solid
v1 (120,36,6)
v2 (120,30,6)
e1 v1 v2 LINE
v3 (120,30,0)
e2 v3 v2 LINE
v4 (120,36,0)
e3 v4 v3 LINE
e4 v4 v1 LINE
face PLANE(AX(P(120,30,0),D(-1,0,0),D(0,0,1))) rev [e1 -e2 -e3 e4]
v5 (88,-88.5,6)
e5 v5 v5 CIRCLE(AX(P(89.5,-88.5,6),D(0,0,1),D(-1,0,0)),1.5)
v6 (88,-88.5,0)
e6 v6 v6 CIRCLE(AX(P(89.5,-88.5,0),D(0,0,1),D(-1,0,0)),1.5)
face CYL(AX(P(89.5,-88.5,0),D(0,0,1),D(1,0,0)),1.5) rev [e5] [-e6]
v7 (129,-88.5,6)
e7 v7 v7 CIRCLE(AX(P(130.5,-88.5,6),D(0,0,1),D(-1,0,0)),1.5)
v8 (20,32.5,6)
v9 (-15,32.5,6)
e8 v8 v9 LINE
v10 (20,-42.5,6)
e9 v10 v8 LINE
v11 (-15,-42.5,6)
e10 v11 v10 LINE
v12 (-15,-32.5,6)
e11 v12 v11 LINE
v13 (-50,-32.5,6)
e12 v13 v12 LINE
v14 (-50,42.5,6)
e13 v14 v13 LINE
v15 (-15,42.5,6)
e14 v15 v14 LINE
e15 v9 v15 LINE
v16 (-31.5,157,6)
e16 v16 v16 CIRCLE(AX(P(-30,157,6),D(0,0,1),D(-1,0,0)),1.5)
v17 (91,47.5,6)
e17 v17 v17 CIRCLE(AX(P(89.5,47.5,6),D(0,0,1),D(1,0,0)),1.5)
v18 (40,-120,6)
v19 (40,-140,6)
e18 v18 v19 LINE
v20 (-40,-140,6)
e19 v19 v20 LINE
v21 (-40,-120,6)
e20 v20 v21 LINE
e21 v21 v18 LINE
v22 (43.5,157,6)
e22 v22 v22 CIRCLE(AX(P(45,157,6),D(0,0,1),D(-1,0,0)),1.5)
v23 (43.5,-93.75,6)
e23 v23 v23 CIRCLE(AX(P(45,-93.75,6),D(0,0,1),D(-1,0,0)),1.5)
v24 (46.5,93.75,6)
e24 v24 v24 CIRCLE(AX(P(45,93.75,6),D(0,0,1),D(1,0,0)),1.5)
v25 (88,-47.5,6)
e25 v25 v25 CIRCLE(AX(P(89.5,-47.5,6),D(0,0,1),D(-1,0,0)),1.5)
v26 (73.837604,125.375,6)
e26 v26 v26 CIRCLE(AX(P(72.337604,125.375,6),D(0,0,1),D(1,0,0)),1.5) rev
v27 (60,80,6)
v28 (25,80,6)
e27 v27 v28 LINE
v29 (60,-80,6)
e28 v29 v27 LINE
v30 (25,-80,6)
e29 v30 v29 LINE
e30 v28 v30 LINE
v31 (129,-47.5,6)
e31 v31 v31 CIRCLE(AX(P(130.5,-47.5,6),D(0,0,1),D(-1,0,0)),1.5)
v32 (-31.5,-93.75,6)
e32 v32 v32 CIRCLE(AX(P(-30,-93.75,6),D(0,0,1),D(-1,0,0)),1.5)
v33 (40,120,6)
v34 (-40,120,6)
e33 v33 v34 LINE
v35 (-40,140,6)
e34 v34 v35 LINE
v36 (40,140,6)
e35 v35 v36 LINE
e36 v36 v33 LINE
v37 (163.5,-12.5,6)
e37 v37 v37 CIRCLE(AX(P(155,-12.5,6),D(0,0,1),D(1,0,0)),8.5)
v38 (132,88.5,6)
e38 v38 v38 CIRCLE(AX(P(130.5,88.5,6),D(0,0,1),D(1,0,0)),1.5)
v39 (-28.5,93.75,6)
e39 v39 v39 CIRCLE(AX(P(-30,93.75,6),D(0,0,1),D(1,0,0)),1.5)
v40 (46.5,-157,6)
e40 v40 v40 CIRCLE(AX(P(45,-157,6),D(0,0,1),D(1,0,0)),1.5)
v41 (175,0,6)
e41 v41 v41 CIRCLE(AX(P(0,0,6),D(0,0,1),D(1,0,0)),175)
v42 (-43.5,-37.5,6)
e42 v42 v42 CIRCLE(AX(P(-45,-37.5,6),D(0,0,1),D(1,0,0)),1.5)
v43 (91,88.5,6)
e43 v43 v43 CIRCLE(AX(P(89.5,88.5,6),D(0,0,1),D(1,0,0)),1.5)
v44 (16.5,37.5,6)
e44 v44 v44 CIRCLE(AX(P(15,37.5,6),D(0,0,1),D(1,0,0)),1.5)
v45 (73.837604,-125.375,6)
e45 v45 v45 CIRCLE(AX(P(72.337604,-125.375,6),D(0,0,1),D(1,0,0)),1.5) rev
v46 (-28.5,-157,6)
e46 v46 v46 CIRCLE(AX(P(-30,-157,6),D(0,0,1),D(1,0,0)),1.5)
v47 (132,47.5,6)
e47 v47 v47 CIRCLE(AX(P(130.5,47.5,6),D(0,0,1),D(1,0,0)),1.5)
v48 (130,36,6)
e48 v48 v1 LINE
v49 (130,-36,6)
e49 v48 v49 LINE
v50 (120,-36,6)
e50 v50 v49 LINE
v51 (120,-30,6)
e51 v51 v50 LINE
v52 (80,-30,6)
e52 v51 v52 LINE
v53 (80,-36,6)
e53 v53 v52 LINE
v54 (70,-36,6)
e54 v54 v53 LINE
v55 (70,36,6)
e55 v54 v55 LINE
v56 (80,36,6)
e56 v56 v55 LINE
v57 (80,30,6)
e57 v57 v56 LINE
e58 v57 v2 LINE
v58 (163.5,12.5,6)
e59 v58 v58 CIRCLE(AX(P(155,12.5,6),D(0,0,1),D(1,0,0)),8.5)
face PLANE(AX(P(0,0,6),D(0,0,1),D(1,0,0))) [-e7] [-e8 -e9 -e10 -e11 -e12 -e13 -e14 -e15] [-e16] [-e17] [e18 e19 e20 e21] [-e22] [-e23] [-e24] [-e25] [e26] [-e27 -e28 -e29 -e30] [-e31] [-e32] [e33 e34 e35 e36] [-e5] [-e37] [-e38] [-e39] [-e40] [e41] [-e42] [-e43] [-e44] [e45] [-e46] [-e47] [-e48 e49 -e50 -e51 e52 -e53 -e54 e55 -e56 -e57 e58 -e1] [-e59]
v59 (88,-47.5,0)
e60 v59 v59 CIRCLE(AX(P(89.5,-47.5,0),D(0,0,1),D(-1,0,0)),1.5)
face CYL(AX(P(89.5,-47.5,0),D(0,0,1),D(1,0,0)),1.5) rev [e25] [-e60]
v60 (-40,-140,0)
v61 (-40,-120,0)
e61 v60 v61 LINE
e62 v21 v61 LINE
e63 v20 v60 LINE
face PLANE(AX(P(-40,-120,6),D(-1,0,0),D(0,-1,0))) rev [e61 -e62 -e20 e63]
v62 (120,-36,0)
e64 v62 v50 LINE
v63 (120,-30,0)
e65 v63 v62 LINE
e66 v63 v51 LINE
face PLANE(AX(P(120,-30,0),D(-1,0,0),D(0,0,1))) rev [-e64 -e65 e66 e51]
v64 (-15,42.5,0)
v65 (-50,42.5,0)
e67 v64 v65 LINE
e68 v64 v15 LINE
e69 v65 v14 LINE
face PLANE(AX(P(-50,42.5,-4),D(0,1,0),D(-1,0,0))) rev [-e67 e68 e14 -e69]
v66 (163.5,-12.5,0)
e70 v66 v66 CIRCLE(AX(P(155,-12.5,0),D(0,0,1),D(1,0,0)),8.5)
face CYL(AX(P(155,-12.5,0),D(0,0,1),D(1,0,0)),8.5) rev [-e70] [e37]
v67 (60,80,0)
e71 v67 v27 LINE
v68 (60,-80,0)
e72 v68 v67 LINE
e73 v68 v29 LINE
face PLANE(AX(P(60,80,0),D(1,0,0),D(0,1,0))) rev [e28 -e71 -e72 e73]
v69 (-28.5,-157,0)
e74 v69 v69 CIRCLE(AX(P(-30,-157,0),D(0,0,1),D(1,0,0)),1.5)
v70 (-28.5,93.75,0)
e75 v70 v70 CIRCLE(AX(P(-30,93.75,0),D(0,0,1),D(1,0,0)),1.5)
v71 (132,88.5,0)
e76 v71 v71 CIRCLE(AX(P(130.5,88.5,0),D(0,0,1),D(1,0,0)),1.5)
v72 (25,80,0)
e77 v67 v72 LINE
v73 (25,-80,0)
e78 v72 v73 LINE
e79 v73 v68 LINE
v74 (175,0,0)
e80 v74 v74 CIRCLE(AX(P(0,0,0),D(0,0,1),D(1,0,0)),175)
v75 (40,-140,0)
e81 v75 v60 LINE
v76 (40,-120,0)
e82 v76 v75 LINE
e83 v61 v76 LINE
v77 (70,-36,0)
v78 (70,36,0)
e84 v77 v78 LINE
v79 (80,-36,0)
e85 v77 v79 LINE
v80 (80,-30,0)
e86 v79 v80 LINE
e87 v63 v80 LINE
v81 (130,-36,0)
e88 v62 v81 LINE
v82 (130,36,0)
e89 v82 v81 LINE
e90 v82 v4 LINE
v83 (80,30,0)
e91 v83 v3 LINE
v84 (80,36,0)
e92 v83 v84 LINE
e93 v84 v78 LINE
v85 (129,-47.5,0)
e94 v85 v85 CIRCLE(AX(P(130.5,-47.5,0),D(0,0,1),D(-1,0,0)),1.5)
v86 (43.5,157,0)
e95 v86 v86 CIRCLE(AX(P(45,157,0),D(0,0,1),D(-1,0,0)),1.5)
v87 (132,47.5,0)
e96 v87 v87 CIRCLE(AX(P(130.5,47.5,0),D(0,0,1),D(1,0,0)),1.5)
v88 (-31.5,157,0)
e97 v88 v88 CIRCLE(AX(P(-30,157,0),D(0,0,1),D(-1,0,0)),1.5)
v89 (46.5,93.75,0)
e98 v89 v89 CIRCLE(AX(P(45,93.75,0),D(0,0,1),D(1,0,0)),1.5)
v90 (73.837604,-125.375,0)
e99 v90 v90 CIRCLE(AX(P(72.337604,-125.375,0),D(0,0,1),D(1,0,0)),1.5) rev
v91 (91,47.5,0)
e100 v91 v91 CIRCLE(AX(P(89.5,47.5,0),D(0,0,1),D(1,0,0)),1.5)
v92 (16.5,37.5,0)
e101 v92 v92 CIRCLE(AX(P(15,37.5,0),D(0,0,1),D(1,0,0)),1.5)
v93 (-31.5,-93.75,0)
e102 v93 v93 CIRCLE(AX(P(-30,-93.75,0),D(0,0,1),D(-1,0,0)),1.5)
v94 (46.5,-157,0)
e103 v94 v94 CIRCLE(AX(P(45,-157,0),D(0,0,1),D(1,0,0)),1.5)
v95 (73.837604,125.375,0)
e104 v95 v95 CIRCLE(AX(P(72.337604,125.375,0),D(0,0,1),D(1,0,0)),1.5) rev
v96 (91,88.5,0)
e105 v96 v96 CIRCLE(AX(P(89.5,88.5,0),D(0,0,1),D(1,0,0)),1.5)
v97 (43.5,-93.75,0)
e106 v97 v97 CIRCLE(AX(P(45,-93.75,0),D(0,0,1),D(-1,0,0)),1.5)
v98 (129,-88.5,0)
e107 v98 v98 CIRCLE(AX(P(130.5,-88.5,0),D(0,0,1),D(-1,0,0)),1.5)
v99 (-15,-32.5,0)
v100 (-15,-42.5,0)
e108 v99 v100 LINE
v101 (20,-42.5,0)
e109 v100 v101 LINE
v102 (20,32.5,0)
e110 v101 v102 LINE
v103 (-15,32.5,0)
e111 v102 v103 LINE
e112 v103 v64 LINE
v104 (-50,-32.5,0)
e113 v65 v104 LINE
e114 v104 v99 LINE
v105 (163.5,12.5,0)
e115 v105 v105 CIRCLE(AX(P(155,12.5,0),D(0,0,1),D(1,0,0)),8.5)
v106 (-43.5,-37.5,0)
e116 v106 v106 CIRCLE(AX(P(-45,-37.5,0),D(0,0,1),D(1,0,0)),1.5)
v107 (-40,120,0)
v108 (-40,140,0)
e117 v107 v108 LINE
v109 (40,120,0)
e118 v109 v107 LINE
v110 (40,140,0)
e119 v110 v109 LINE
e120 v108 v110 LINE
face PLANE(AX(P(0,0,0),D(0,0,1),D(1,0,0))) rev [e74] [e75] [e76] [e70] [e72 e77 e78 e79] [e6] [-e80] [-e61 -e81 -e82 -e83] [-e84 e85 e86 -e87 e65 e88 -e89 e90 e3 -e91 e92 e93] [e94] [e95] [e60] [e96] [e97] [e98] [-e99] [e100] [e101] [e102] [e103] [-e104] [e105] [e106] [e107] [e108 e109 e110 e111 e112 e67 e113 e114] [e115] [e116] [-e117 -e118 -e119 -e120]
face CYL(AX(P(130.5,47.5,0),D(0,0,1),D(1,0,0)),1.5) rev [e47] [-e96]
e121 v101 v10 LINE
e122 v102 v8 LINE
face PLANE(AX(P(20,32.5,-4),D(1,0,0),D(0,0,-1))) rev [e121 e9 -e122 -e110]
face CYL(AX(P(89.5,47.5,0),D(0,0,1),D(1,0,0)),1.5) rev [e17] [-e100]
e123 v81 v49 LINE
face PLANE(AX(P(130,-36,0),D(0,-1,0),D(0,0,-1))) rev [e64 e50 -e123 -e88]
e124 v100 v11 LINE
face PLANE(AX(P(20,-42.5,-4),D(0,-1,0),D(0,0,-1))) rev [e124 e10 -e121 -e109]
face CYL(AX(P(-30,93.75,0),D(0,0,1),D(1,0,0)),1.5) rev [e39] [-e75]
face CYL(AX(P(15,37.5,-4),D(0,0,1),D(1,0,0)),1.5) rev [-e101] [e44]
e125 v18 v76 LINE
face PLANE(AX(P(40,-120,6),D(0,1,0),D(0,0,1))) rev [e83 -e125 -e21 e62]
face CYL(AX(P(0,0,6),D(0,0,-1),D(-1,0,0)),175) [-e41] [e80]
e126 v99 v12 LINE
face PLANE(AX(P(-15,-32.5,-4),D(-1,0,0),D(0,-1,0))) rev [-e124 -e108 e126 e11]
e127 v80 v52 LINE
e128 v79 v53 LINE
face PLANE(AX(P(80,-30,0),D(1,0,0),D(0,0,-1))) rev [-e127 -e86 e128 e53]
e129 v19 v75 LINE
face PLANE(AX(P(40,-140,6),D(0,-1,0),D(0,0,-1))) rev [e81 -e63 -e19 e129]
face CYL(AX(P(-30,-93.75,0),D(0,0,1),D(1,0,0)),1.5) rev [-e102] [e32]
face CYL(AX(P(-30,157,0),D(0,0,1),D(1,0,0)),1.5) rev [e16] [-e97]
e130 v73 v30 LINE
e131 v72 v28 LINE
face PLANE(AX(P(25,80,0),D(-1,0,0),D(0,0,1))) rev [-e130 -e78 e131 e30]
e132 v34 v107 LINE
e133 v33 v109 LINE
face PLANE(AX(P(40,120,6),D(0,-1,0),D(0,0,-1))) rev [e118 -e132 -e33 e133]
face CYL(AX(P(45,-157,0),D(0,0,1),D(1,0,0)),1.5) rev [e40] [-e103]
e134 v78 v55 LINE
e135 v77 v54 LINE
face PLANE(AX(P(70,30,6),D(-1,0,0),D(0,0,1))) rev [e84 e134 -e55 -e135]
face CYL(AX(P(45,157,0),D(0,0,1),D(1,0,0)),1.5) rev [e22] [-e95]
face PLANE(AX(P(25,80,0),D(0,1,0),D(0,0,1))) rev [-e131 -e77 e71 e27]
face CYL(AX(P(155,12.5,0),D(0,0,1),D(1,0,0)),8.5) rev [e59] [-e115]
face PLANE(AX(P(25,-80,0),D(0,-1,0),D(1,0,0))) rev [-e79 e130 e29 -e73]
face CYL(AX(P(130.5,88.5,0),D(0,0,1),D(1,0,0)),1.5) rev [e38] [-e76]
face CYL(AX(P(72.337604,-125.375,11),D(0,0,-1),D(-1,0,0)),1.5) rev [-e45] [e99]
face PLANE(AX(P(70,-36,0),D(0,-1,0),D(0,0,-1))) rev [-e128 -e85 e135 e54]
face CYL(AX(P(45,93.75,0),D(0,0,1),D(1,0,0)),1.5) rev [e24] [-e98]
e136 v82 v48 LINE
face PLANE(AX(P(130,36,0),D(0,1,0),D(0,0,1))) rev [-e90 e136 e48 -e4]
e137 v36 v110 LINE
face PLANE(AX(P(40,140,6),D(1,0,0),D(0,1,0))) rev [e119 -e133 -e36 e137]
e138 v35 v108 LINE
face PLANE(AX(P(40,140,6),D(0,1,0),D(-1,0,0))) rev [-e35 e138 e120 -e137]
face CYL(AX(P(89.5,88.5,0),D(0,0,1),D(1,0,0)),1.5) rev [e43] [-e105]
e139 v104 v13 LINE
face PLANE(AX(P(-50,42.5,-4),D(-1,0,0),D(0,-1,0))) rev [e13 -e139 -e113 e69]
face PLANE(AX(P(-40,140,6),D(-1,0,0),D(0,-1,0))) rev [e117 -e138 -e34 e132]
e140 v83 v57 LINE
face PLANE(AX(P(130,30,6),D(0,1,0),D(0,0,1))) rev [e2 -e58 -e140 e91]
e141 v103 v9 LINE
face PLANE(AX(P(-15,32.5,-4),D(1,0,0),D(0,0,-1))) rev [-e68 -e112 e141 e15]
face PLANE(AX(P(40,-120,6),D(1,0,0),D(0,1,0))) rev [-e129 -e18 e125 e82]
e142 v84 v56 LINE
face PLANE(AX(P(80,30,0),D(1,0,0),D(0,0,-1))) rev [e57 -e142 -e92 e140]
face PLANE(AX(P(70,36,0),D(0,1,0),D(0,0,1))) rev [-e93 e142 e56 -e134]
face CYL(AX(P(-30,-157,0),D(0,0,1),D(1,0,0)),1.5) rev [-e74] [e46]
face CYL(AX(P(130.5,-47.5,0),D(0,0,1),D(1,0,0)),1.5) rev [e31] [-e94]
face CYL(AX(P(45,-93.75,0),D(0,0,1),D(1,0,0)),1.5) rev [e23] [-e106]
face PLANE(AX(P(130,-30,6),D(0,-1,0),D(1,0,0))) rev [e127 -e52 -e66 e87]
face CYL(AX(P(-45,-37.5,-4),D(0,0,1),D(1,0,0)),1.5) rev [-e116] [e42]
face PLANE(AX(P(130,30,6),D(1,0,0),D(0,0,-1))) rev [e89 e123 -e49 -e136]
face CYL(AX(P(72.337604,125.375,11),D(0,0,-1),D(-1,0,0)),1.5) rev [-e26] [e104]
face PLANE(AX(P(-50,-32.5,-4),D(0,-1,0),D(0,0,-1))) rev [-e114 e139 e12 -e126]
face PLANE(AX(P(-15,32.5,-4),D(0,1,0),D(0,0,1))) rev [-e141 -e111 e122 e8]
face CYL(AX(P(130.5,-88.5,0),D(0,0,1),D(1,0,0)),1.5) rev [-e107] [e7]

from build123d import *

# Parameters (mm, degrees)
SKETCH1_R           = 175
BOSS_EXTRUDE1_DEPTH = 6
SKETCH2_W           = 80
SKETCH2_H           = 20
SKETCH2_W_2         = 60
SKETCH2_H_2         = 60
CUT_EXTRUDE1_DEPTH  = 248.560093715
SKETCH3_W           = 10
SKETCH3_H           = 6
CUT_EXTRUDE2_DEPTH  = 248.560093715
SKETCH4_R           = 1.5
CUT_EXTRUDE3_DEPTH  = 248.560093715
SKETCH5_R           = 1.5
CUT_EXTRUDE4_DEPTH  = 248.560093715
SKETCH6_R           = 8.5
CUT_EXTRUDE5_DEPTH  = 248.560093715
CAVITY1_OUTLINE_R   = 1.5
CAVITY1_DEPTH       = 6
SKETCH7_W           = 35
SKETCH7_H           = 160
CUT_EXTRUDE6_DEPTH  = 248.560093715
SKETCH8_R           = 1.5
CUT_EXTRUDE7_DEPTH  = 10


# Read off the part's stored shape, not the designer's step: Cavity1
with BuildPart() as part:
    # Sketch1 → Boss-Extrude1 (new body)
    with BuildSketch(Plane.XY):
        Circle(SKETCH1_R)
    extrude(amount=BOSS_EXTRUDE1_DEPTH)

    # Sketch2 → Cut-Extrude1 (cut, through all)
    with BuildSketch(Plane(origin=(0, 0, 0), x_dir=(-1, 0, 0), z_dir=(0, 0, -1))):
        with Locations((0, 130)):
            Rectangle(SKETCH2_W, SKETCH2_H)
        with Locations((0, -130)):
            Rectangle(SKETCH2_W, SKETCH2_H)
        with Locations((-100, 0)):
            Rectangle(SKETCH2_W_2, SKETCH2_H_2)
    extrude(amount=-CUT_EXTRUDE1_DEPTH, mode=Mode.SUBTRACT)

    # Sketch3 → Cut-Extrude2 (cut, through all)
    with BuildSketch(Plane.XY.offset(6)):
        with Locations((75, 33)):
            Rectangle(SKETCH3_W, SKETCH3_H)
        with Locations((125, 33)):
            Rectangle(SKETCH3_W, SKETCH3_H)
        with Locations((75, -33)):
            Rectangle(SKETCH3_W, SKETCH3_H)
        with Locations((125, -33)):
            Rectangle(SKETCH3_W, SKETCH3_H)
    extrude(amount=-CUT_EXTRUDE2_DEPTH, mode=Mode.SUBTRACT)

    # Sketch4 → Cut-Extrude3 (cut, through all)
    with BuildSketch(Plane.XY.offset(6)):
        with Locations((-30, -157)):
            Circle(SKETCH4_R)
        with Locations((45, -157)):
            Circle(SKETCH4_R)
        with Locations(Location((-30, 157, 0), (0, 0, 180))):
            Circle(SKETCH4_R)
        with Locations(Location((45, 157, 0), (0, 0, 180))):
            Circle(SKETCH4_R)
        with Locations(Location((45, -93.75, 0), (0, 0, 180))):
            Circle(SKETCH4_R)
        with Locations(Location((-30, -93.75, 0), (0, 0, 180))):
            Circle(SKETCH4_R)
        with Locations((45, 93.75)):
            Circle(SKETCH4_R)
        with Locations((-30, 93.75)):
            Circle(SKETCH4_R)
    extrude(amount=-CUT_EXTRUDE3_DEPTH, mode=Mode.SUBTRACT)

    # Sketch5 → Cut-Extrude4 (cut, through all)
    with BuildSketch(Plane.XY.offset(6)):
        with Locations((89.5, 88.5)):
            Circle(SKETCH5_R)
        with Locations((130.5, 88.5)):
            Circle(SKETCH5_R)
        with Locations((130.5, 47.5)):
            Circle(SKETCH5_R)
        with Locations((89.5, 47.5)):
            Circle(SKETCH5_R)
        with Locations(Location((89.5, -88.5, 0), (0, 0, 180))):
            Circle(SKETCH5_R)
        with Locations(Location((130.5, -88.5, 0), (0, 0, 180))):
            Circle(SKETCH5_R)
        with Locations(Location((130.5, -47.5, 0), (0, 0, 180))):
            Circle(SKETCH5_R)
        with Locations(Location((89.5, -47.5, 0), (0, 0, 180))):
            Circle(SKETCH5_R)
    extrude(amount=-CUT_EXTRUDE4_DEPTH, mode=Mode.SUBTRACT)

    # Sketch6 → Cut-Extrude5 (cut, through all)
    with BuildSketch(Plane.XY.offset(6)):
        with Locations((155, 12.5)):
            Circle(SKETCH6_R)
        with Locations((155, -12.5)):
            Circle(SKETCH6_R)
    extrude(amount=-CUT_EXTRUDE5_DEPTH, mode=Mode.SUBTRACT)

    # Cavity1 outline → Cavity1 (cut)
    with BuildSketch(Plane.XY):
        with Locations((72.337603572, -125.375)):
            Circle(CAVITY1_OUTLINE_R)
        with Locations((72.337603572, 125.375)):
            Circle(CAVITY1_OUTLINE_R)
    extrude(amount=CAVITY1_DEPTH, mode=Mode.SUBTRACT)

    # Sketch7 → Cut-Extrude6 (cut, through all)
    with BuildSketch(Plane.XY.offset(6)):
        with Locations((42.5, 0)):
            Rectangle(SKETCH7_W, SKETCH7_H)
    extrude(amount=-CUT_EXTRUDE6_DEPTH, mode=Mode.SUBTRACT)

    # Sketch8 → Cut-Extrude7 (cut)
    with BuildSketch(Plane.XY.offset(6)):
        with Locations((15, 37.5)):
            Circle(SKETCH8_R)
        with Locations((-45, -37.5)):
            Circle(SKETCH8_R)
        Polygon((-15, 32.5), (20, 32.5), (20, -32.5), (20, -42.5), (-15, -42.5), (-15, -32.5), (-50, -32.5), (-50, 42.5), (-15, 42.5), align=None)
    extrude(amount=-CUT_EXTRUDE7_DEPTH, mode=Mode.SUBTRACT)


solid = part.part
